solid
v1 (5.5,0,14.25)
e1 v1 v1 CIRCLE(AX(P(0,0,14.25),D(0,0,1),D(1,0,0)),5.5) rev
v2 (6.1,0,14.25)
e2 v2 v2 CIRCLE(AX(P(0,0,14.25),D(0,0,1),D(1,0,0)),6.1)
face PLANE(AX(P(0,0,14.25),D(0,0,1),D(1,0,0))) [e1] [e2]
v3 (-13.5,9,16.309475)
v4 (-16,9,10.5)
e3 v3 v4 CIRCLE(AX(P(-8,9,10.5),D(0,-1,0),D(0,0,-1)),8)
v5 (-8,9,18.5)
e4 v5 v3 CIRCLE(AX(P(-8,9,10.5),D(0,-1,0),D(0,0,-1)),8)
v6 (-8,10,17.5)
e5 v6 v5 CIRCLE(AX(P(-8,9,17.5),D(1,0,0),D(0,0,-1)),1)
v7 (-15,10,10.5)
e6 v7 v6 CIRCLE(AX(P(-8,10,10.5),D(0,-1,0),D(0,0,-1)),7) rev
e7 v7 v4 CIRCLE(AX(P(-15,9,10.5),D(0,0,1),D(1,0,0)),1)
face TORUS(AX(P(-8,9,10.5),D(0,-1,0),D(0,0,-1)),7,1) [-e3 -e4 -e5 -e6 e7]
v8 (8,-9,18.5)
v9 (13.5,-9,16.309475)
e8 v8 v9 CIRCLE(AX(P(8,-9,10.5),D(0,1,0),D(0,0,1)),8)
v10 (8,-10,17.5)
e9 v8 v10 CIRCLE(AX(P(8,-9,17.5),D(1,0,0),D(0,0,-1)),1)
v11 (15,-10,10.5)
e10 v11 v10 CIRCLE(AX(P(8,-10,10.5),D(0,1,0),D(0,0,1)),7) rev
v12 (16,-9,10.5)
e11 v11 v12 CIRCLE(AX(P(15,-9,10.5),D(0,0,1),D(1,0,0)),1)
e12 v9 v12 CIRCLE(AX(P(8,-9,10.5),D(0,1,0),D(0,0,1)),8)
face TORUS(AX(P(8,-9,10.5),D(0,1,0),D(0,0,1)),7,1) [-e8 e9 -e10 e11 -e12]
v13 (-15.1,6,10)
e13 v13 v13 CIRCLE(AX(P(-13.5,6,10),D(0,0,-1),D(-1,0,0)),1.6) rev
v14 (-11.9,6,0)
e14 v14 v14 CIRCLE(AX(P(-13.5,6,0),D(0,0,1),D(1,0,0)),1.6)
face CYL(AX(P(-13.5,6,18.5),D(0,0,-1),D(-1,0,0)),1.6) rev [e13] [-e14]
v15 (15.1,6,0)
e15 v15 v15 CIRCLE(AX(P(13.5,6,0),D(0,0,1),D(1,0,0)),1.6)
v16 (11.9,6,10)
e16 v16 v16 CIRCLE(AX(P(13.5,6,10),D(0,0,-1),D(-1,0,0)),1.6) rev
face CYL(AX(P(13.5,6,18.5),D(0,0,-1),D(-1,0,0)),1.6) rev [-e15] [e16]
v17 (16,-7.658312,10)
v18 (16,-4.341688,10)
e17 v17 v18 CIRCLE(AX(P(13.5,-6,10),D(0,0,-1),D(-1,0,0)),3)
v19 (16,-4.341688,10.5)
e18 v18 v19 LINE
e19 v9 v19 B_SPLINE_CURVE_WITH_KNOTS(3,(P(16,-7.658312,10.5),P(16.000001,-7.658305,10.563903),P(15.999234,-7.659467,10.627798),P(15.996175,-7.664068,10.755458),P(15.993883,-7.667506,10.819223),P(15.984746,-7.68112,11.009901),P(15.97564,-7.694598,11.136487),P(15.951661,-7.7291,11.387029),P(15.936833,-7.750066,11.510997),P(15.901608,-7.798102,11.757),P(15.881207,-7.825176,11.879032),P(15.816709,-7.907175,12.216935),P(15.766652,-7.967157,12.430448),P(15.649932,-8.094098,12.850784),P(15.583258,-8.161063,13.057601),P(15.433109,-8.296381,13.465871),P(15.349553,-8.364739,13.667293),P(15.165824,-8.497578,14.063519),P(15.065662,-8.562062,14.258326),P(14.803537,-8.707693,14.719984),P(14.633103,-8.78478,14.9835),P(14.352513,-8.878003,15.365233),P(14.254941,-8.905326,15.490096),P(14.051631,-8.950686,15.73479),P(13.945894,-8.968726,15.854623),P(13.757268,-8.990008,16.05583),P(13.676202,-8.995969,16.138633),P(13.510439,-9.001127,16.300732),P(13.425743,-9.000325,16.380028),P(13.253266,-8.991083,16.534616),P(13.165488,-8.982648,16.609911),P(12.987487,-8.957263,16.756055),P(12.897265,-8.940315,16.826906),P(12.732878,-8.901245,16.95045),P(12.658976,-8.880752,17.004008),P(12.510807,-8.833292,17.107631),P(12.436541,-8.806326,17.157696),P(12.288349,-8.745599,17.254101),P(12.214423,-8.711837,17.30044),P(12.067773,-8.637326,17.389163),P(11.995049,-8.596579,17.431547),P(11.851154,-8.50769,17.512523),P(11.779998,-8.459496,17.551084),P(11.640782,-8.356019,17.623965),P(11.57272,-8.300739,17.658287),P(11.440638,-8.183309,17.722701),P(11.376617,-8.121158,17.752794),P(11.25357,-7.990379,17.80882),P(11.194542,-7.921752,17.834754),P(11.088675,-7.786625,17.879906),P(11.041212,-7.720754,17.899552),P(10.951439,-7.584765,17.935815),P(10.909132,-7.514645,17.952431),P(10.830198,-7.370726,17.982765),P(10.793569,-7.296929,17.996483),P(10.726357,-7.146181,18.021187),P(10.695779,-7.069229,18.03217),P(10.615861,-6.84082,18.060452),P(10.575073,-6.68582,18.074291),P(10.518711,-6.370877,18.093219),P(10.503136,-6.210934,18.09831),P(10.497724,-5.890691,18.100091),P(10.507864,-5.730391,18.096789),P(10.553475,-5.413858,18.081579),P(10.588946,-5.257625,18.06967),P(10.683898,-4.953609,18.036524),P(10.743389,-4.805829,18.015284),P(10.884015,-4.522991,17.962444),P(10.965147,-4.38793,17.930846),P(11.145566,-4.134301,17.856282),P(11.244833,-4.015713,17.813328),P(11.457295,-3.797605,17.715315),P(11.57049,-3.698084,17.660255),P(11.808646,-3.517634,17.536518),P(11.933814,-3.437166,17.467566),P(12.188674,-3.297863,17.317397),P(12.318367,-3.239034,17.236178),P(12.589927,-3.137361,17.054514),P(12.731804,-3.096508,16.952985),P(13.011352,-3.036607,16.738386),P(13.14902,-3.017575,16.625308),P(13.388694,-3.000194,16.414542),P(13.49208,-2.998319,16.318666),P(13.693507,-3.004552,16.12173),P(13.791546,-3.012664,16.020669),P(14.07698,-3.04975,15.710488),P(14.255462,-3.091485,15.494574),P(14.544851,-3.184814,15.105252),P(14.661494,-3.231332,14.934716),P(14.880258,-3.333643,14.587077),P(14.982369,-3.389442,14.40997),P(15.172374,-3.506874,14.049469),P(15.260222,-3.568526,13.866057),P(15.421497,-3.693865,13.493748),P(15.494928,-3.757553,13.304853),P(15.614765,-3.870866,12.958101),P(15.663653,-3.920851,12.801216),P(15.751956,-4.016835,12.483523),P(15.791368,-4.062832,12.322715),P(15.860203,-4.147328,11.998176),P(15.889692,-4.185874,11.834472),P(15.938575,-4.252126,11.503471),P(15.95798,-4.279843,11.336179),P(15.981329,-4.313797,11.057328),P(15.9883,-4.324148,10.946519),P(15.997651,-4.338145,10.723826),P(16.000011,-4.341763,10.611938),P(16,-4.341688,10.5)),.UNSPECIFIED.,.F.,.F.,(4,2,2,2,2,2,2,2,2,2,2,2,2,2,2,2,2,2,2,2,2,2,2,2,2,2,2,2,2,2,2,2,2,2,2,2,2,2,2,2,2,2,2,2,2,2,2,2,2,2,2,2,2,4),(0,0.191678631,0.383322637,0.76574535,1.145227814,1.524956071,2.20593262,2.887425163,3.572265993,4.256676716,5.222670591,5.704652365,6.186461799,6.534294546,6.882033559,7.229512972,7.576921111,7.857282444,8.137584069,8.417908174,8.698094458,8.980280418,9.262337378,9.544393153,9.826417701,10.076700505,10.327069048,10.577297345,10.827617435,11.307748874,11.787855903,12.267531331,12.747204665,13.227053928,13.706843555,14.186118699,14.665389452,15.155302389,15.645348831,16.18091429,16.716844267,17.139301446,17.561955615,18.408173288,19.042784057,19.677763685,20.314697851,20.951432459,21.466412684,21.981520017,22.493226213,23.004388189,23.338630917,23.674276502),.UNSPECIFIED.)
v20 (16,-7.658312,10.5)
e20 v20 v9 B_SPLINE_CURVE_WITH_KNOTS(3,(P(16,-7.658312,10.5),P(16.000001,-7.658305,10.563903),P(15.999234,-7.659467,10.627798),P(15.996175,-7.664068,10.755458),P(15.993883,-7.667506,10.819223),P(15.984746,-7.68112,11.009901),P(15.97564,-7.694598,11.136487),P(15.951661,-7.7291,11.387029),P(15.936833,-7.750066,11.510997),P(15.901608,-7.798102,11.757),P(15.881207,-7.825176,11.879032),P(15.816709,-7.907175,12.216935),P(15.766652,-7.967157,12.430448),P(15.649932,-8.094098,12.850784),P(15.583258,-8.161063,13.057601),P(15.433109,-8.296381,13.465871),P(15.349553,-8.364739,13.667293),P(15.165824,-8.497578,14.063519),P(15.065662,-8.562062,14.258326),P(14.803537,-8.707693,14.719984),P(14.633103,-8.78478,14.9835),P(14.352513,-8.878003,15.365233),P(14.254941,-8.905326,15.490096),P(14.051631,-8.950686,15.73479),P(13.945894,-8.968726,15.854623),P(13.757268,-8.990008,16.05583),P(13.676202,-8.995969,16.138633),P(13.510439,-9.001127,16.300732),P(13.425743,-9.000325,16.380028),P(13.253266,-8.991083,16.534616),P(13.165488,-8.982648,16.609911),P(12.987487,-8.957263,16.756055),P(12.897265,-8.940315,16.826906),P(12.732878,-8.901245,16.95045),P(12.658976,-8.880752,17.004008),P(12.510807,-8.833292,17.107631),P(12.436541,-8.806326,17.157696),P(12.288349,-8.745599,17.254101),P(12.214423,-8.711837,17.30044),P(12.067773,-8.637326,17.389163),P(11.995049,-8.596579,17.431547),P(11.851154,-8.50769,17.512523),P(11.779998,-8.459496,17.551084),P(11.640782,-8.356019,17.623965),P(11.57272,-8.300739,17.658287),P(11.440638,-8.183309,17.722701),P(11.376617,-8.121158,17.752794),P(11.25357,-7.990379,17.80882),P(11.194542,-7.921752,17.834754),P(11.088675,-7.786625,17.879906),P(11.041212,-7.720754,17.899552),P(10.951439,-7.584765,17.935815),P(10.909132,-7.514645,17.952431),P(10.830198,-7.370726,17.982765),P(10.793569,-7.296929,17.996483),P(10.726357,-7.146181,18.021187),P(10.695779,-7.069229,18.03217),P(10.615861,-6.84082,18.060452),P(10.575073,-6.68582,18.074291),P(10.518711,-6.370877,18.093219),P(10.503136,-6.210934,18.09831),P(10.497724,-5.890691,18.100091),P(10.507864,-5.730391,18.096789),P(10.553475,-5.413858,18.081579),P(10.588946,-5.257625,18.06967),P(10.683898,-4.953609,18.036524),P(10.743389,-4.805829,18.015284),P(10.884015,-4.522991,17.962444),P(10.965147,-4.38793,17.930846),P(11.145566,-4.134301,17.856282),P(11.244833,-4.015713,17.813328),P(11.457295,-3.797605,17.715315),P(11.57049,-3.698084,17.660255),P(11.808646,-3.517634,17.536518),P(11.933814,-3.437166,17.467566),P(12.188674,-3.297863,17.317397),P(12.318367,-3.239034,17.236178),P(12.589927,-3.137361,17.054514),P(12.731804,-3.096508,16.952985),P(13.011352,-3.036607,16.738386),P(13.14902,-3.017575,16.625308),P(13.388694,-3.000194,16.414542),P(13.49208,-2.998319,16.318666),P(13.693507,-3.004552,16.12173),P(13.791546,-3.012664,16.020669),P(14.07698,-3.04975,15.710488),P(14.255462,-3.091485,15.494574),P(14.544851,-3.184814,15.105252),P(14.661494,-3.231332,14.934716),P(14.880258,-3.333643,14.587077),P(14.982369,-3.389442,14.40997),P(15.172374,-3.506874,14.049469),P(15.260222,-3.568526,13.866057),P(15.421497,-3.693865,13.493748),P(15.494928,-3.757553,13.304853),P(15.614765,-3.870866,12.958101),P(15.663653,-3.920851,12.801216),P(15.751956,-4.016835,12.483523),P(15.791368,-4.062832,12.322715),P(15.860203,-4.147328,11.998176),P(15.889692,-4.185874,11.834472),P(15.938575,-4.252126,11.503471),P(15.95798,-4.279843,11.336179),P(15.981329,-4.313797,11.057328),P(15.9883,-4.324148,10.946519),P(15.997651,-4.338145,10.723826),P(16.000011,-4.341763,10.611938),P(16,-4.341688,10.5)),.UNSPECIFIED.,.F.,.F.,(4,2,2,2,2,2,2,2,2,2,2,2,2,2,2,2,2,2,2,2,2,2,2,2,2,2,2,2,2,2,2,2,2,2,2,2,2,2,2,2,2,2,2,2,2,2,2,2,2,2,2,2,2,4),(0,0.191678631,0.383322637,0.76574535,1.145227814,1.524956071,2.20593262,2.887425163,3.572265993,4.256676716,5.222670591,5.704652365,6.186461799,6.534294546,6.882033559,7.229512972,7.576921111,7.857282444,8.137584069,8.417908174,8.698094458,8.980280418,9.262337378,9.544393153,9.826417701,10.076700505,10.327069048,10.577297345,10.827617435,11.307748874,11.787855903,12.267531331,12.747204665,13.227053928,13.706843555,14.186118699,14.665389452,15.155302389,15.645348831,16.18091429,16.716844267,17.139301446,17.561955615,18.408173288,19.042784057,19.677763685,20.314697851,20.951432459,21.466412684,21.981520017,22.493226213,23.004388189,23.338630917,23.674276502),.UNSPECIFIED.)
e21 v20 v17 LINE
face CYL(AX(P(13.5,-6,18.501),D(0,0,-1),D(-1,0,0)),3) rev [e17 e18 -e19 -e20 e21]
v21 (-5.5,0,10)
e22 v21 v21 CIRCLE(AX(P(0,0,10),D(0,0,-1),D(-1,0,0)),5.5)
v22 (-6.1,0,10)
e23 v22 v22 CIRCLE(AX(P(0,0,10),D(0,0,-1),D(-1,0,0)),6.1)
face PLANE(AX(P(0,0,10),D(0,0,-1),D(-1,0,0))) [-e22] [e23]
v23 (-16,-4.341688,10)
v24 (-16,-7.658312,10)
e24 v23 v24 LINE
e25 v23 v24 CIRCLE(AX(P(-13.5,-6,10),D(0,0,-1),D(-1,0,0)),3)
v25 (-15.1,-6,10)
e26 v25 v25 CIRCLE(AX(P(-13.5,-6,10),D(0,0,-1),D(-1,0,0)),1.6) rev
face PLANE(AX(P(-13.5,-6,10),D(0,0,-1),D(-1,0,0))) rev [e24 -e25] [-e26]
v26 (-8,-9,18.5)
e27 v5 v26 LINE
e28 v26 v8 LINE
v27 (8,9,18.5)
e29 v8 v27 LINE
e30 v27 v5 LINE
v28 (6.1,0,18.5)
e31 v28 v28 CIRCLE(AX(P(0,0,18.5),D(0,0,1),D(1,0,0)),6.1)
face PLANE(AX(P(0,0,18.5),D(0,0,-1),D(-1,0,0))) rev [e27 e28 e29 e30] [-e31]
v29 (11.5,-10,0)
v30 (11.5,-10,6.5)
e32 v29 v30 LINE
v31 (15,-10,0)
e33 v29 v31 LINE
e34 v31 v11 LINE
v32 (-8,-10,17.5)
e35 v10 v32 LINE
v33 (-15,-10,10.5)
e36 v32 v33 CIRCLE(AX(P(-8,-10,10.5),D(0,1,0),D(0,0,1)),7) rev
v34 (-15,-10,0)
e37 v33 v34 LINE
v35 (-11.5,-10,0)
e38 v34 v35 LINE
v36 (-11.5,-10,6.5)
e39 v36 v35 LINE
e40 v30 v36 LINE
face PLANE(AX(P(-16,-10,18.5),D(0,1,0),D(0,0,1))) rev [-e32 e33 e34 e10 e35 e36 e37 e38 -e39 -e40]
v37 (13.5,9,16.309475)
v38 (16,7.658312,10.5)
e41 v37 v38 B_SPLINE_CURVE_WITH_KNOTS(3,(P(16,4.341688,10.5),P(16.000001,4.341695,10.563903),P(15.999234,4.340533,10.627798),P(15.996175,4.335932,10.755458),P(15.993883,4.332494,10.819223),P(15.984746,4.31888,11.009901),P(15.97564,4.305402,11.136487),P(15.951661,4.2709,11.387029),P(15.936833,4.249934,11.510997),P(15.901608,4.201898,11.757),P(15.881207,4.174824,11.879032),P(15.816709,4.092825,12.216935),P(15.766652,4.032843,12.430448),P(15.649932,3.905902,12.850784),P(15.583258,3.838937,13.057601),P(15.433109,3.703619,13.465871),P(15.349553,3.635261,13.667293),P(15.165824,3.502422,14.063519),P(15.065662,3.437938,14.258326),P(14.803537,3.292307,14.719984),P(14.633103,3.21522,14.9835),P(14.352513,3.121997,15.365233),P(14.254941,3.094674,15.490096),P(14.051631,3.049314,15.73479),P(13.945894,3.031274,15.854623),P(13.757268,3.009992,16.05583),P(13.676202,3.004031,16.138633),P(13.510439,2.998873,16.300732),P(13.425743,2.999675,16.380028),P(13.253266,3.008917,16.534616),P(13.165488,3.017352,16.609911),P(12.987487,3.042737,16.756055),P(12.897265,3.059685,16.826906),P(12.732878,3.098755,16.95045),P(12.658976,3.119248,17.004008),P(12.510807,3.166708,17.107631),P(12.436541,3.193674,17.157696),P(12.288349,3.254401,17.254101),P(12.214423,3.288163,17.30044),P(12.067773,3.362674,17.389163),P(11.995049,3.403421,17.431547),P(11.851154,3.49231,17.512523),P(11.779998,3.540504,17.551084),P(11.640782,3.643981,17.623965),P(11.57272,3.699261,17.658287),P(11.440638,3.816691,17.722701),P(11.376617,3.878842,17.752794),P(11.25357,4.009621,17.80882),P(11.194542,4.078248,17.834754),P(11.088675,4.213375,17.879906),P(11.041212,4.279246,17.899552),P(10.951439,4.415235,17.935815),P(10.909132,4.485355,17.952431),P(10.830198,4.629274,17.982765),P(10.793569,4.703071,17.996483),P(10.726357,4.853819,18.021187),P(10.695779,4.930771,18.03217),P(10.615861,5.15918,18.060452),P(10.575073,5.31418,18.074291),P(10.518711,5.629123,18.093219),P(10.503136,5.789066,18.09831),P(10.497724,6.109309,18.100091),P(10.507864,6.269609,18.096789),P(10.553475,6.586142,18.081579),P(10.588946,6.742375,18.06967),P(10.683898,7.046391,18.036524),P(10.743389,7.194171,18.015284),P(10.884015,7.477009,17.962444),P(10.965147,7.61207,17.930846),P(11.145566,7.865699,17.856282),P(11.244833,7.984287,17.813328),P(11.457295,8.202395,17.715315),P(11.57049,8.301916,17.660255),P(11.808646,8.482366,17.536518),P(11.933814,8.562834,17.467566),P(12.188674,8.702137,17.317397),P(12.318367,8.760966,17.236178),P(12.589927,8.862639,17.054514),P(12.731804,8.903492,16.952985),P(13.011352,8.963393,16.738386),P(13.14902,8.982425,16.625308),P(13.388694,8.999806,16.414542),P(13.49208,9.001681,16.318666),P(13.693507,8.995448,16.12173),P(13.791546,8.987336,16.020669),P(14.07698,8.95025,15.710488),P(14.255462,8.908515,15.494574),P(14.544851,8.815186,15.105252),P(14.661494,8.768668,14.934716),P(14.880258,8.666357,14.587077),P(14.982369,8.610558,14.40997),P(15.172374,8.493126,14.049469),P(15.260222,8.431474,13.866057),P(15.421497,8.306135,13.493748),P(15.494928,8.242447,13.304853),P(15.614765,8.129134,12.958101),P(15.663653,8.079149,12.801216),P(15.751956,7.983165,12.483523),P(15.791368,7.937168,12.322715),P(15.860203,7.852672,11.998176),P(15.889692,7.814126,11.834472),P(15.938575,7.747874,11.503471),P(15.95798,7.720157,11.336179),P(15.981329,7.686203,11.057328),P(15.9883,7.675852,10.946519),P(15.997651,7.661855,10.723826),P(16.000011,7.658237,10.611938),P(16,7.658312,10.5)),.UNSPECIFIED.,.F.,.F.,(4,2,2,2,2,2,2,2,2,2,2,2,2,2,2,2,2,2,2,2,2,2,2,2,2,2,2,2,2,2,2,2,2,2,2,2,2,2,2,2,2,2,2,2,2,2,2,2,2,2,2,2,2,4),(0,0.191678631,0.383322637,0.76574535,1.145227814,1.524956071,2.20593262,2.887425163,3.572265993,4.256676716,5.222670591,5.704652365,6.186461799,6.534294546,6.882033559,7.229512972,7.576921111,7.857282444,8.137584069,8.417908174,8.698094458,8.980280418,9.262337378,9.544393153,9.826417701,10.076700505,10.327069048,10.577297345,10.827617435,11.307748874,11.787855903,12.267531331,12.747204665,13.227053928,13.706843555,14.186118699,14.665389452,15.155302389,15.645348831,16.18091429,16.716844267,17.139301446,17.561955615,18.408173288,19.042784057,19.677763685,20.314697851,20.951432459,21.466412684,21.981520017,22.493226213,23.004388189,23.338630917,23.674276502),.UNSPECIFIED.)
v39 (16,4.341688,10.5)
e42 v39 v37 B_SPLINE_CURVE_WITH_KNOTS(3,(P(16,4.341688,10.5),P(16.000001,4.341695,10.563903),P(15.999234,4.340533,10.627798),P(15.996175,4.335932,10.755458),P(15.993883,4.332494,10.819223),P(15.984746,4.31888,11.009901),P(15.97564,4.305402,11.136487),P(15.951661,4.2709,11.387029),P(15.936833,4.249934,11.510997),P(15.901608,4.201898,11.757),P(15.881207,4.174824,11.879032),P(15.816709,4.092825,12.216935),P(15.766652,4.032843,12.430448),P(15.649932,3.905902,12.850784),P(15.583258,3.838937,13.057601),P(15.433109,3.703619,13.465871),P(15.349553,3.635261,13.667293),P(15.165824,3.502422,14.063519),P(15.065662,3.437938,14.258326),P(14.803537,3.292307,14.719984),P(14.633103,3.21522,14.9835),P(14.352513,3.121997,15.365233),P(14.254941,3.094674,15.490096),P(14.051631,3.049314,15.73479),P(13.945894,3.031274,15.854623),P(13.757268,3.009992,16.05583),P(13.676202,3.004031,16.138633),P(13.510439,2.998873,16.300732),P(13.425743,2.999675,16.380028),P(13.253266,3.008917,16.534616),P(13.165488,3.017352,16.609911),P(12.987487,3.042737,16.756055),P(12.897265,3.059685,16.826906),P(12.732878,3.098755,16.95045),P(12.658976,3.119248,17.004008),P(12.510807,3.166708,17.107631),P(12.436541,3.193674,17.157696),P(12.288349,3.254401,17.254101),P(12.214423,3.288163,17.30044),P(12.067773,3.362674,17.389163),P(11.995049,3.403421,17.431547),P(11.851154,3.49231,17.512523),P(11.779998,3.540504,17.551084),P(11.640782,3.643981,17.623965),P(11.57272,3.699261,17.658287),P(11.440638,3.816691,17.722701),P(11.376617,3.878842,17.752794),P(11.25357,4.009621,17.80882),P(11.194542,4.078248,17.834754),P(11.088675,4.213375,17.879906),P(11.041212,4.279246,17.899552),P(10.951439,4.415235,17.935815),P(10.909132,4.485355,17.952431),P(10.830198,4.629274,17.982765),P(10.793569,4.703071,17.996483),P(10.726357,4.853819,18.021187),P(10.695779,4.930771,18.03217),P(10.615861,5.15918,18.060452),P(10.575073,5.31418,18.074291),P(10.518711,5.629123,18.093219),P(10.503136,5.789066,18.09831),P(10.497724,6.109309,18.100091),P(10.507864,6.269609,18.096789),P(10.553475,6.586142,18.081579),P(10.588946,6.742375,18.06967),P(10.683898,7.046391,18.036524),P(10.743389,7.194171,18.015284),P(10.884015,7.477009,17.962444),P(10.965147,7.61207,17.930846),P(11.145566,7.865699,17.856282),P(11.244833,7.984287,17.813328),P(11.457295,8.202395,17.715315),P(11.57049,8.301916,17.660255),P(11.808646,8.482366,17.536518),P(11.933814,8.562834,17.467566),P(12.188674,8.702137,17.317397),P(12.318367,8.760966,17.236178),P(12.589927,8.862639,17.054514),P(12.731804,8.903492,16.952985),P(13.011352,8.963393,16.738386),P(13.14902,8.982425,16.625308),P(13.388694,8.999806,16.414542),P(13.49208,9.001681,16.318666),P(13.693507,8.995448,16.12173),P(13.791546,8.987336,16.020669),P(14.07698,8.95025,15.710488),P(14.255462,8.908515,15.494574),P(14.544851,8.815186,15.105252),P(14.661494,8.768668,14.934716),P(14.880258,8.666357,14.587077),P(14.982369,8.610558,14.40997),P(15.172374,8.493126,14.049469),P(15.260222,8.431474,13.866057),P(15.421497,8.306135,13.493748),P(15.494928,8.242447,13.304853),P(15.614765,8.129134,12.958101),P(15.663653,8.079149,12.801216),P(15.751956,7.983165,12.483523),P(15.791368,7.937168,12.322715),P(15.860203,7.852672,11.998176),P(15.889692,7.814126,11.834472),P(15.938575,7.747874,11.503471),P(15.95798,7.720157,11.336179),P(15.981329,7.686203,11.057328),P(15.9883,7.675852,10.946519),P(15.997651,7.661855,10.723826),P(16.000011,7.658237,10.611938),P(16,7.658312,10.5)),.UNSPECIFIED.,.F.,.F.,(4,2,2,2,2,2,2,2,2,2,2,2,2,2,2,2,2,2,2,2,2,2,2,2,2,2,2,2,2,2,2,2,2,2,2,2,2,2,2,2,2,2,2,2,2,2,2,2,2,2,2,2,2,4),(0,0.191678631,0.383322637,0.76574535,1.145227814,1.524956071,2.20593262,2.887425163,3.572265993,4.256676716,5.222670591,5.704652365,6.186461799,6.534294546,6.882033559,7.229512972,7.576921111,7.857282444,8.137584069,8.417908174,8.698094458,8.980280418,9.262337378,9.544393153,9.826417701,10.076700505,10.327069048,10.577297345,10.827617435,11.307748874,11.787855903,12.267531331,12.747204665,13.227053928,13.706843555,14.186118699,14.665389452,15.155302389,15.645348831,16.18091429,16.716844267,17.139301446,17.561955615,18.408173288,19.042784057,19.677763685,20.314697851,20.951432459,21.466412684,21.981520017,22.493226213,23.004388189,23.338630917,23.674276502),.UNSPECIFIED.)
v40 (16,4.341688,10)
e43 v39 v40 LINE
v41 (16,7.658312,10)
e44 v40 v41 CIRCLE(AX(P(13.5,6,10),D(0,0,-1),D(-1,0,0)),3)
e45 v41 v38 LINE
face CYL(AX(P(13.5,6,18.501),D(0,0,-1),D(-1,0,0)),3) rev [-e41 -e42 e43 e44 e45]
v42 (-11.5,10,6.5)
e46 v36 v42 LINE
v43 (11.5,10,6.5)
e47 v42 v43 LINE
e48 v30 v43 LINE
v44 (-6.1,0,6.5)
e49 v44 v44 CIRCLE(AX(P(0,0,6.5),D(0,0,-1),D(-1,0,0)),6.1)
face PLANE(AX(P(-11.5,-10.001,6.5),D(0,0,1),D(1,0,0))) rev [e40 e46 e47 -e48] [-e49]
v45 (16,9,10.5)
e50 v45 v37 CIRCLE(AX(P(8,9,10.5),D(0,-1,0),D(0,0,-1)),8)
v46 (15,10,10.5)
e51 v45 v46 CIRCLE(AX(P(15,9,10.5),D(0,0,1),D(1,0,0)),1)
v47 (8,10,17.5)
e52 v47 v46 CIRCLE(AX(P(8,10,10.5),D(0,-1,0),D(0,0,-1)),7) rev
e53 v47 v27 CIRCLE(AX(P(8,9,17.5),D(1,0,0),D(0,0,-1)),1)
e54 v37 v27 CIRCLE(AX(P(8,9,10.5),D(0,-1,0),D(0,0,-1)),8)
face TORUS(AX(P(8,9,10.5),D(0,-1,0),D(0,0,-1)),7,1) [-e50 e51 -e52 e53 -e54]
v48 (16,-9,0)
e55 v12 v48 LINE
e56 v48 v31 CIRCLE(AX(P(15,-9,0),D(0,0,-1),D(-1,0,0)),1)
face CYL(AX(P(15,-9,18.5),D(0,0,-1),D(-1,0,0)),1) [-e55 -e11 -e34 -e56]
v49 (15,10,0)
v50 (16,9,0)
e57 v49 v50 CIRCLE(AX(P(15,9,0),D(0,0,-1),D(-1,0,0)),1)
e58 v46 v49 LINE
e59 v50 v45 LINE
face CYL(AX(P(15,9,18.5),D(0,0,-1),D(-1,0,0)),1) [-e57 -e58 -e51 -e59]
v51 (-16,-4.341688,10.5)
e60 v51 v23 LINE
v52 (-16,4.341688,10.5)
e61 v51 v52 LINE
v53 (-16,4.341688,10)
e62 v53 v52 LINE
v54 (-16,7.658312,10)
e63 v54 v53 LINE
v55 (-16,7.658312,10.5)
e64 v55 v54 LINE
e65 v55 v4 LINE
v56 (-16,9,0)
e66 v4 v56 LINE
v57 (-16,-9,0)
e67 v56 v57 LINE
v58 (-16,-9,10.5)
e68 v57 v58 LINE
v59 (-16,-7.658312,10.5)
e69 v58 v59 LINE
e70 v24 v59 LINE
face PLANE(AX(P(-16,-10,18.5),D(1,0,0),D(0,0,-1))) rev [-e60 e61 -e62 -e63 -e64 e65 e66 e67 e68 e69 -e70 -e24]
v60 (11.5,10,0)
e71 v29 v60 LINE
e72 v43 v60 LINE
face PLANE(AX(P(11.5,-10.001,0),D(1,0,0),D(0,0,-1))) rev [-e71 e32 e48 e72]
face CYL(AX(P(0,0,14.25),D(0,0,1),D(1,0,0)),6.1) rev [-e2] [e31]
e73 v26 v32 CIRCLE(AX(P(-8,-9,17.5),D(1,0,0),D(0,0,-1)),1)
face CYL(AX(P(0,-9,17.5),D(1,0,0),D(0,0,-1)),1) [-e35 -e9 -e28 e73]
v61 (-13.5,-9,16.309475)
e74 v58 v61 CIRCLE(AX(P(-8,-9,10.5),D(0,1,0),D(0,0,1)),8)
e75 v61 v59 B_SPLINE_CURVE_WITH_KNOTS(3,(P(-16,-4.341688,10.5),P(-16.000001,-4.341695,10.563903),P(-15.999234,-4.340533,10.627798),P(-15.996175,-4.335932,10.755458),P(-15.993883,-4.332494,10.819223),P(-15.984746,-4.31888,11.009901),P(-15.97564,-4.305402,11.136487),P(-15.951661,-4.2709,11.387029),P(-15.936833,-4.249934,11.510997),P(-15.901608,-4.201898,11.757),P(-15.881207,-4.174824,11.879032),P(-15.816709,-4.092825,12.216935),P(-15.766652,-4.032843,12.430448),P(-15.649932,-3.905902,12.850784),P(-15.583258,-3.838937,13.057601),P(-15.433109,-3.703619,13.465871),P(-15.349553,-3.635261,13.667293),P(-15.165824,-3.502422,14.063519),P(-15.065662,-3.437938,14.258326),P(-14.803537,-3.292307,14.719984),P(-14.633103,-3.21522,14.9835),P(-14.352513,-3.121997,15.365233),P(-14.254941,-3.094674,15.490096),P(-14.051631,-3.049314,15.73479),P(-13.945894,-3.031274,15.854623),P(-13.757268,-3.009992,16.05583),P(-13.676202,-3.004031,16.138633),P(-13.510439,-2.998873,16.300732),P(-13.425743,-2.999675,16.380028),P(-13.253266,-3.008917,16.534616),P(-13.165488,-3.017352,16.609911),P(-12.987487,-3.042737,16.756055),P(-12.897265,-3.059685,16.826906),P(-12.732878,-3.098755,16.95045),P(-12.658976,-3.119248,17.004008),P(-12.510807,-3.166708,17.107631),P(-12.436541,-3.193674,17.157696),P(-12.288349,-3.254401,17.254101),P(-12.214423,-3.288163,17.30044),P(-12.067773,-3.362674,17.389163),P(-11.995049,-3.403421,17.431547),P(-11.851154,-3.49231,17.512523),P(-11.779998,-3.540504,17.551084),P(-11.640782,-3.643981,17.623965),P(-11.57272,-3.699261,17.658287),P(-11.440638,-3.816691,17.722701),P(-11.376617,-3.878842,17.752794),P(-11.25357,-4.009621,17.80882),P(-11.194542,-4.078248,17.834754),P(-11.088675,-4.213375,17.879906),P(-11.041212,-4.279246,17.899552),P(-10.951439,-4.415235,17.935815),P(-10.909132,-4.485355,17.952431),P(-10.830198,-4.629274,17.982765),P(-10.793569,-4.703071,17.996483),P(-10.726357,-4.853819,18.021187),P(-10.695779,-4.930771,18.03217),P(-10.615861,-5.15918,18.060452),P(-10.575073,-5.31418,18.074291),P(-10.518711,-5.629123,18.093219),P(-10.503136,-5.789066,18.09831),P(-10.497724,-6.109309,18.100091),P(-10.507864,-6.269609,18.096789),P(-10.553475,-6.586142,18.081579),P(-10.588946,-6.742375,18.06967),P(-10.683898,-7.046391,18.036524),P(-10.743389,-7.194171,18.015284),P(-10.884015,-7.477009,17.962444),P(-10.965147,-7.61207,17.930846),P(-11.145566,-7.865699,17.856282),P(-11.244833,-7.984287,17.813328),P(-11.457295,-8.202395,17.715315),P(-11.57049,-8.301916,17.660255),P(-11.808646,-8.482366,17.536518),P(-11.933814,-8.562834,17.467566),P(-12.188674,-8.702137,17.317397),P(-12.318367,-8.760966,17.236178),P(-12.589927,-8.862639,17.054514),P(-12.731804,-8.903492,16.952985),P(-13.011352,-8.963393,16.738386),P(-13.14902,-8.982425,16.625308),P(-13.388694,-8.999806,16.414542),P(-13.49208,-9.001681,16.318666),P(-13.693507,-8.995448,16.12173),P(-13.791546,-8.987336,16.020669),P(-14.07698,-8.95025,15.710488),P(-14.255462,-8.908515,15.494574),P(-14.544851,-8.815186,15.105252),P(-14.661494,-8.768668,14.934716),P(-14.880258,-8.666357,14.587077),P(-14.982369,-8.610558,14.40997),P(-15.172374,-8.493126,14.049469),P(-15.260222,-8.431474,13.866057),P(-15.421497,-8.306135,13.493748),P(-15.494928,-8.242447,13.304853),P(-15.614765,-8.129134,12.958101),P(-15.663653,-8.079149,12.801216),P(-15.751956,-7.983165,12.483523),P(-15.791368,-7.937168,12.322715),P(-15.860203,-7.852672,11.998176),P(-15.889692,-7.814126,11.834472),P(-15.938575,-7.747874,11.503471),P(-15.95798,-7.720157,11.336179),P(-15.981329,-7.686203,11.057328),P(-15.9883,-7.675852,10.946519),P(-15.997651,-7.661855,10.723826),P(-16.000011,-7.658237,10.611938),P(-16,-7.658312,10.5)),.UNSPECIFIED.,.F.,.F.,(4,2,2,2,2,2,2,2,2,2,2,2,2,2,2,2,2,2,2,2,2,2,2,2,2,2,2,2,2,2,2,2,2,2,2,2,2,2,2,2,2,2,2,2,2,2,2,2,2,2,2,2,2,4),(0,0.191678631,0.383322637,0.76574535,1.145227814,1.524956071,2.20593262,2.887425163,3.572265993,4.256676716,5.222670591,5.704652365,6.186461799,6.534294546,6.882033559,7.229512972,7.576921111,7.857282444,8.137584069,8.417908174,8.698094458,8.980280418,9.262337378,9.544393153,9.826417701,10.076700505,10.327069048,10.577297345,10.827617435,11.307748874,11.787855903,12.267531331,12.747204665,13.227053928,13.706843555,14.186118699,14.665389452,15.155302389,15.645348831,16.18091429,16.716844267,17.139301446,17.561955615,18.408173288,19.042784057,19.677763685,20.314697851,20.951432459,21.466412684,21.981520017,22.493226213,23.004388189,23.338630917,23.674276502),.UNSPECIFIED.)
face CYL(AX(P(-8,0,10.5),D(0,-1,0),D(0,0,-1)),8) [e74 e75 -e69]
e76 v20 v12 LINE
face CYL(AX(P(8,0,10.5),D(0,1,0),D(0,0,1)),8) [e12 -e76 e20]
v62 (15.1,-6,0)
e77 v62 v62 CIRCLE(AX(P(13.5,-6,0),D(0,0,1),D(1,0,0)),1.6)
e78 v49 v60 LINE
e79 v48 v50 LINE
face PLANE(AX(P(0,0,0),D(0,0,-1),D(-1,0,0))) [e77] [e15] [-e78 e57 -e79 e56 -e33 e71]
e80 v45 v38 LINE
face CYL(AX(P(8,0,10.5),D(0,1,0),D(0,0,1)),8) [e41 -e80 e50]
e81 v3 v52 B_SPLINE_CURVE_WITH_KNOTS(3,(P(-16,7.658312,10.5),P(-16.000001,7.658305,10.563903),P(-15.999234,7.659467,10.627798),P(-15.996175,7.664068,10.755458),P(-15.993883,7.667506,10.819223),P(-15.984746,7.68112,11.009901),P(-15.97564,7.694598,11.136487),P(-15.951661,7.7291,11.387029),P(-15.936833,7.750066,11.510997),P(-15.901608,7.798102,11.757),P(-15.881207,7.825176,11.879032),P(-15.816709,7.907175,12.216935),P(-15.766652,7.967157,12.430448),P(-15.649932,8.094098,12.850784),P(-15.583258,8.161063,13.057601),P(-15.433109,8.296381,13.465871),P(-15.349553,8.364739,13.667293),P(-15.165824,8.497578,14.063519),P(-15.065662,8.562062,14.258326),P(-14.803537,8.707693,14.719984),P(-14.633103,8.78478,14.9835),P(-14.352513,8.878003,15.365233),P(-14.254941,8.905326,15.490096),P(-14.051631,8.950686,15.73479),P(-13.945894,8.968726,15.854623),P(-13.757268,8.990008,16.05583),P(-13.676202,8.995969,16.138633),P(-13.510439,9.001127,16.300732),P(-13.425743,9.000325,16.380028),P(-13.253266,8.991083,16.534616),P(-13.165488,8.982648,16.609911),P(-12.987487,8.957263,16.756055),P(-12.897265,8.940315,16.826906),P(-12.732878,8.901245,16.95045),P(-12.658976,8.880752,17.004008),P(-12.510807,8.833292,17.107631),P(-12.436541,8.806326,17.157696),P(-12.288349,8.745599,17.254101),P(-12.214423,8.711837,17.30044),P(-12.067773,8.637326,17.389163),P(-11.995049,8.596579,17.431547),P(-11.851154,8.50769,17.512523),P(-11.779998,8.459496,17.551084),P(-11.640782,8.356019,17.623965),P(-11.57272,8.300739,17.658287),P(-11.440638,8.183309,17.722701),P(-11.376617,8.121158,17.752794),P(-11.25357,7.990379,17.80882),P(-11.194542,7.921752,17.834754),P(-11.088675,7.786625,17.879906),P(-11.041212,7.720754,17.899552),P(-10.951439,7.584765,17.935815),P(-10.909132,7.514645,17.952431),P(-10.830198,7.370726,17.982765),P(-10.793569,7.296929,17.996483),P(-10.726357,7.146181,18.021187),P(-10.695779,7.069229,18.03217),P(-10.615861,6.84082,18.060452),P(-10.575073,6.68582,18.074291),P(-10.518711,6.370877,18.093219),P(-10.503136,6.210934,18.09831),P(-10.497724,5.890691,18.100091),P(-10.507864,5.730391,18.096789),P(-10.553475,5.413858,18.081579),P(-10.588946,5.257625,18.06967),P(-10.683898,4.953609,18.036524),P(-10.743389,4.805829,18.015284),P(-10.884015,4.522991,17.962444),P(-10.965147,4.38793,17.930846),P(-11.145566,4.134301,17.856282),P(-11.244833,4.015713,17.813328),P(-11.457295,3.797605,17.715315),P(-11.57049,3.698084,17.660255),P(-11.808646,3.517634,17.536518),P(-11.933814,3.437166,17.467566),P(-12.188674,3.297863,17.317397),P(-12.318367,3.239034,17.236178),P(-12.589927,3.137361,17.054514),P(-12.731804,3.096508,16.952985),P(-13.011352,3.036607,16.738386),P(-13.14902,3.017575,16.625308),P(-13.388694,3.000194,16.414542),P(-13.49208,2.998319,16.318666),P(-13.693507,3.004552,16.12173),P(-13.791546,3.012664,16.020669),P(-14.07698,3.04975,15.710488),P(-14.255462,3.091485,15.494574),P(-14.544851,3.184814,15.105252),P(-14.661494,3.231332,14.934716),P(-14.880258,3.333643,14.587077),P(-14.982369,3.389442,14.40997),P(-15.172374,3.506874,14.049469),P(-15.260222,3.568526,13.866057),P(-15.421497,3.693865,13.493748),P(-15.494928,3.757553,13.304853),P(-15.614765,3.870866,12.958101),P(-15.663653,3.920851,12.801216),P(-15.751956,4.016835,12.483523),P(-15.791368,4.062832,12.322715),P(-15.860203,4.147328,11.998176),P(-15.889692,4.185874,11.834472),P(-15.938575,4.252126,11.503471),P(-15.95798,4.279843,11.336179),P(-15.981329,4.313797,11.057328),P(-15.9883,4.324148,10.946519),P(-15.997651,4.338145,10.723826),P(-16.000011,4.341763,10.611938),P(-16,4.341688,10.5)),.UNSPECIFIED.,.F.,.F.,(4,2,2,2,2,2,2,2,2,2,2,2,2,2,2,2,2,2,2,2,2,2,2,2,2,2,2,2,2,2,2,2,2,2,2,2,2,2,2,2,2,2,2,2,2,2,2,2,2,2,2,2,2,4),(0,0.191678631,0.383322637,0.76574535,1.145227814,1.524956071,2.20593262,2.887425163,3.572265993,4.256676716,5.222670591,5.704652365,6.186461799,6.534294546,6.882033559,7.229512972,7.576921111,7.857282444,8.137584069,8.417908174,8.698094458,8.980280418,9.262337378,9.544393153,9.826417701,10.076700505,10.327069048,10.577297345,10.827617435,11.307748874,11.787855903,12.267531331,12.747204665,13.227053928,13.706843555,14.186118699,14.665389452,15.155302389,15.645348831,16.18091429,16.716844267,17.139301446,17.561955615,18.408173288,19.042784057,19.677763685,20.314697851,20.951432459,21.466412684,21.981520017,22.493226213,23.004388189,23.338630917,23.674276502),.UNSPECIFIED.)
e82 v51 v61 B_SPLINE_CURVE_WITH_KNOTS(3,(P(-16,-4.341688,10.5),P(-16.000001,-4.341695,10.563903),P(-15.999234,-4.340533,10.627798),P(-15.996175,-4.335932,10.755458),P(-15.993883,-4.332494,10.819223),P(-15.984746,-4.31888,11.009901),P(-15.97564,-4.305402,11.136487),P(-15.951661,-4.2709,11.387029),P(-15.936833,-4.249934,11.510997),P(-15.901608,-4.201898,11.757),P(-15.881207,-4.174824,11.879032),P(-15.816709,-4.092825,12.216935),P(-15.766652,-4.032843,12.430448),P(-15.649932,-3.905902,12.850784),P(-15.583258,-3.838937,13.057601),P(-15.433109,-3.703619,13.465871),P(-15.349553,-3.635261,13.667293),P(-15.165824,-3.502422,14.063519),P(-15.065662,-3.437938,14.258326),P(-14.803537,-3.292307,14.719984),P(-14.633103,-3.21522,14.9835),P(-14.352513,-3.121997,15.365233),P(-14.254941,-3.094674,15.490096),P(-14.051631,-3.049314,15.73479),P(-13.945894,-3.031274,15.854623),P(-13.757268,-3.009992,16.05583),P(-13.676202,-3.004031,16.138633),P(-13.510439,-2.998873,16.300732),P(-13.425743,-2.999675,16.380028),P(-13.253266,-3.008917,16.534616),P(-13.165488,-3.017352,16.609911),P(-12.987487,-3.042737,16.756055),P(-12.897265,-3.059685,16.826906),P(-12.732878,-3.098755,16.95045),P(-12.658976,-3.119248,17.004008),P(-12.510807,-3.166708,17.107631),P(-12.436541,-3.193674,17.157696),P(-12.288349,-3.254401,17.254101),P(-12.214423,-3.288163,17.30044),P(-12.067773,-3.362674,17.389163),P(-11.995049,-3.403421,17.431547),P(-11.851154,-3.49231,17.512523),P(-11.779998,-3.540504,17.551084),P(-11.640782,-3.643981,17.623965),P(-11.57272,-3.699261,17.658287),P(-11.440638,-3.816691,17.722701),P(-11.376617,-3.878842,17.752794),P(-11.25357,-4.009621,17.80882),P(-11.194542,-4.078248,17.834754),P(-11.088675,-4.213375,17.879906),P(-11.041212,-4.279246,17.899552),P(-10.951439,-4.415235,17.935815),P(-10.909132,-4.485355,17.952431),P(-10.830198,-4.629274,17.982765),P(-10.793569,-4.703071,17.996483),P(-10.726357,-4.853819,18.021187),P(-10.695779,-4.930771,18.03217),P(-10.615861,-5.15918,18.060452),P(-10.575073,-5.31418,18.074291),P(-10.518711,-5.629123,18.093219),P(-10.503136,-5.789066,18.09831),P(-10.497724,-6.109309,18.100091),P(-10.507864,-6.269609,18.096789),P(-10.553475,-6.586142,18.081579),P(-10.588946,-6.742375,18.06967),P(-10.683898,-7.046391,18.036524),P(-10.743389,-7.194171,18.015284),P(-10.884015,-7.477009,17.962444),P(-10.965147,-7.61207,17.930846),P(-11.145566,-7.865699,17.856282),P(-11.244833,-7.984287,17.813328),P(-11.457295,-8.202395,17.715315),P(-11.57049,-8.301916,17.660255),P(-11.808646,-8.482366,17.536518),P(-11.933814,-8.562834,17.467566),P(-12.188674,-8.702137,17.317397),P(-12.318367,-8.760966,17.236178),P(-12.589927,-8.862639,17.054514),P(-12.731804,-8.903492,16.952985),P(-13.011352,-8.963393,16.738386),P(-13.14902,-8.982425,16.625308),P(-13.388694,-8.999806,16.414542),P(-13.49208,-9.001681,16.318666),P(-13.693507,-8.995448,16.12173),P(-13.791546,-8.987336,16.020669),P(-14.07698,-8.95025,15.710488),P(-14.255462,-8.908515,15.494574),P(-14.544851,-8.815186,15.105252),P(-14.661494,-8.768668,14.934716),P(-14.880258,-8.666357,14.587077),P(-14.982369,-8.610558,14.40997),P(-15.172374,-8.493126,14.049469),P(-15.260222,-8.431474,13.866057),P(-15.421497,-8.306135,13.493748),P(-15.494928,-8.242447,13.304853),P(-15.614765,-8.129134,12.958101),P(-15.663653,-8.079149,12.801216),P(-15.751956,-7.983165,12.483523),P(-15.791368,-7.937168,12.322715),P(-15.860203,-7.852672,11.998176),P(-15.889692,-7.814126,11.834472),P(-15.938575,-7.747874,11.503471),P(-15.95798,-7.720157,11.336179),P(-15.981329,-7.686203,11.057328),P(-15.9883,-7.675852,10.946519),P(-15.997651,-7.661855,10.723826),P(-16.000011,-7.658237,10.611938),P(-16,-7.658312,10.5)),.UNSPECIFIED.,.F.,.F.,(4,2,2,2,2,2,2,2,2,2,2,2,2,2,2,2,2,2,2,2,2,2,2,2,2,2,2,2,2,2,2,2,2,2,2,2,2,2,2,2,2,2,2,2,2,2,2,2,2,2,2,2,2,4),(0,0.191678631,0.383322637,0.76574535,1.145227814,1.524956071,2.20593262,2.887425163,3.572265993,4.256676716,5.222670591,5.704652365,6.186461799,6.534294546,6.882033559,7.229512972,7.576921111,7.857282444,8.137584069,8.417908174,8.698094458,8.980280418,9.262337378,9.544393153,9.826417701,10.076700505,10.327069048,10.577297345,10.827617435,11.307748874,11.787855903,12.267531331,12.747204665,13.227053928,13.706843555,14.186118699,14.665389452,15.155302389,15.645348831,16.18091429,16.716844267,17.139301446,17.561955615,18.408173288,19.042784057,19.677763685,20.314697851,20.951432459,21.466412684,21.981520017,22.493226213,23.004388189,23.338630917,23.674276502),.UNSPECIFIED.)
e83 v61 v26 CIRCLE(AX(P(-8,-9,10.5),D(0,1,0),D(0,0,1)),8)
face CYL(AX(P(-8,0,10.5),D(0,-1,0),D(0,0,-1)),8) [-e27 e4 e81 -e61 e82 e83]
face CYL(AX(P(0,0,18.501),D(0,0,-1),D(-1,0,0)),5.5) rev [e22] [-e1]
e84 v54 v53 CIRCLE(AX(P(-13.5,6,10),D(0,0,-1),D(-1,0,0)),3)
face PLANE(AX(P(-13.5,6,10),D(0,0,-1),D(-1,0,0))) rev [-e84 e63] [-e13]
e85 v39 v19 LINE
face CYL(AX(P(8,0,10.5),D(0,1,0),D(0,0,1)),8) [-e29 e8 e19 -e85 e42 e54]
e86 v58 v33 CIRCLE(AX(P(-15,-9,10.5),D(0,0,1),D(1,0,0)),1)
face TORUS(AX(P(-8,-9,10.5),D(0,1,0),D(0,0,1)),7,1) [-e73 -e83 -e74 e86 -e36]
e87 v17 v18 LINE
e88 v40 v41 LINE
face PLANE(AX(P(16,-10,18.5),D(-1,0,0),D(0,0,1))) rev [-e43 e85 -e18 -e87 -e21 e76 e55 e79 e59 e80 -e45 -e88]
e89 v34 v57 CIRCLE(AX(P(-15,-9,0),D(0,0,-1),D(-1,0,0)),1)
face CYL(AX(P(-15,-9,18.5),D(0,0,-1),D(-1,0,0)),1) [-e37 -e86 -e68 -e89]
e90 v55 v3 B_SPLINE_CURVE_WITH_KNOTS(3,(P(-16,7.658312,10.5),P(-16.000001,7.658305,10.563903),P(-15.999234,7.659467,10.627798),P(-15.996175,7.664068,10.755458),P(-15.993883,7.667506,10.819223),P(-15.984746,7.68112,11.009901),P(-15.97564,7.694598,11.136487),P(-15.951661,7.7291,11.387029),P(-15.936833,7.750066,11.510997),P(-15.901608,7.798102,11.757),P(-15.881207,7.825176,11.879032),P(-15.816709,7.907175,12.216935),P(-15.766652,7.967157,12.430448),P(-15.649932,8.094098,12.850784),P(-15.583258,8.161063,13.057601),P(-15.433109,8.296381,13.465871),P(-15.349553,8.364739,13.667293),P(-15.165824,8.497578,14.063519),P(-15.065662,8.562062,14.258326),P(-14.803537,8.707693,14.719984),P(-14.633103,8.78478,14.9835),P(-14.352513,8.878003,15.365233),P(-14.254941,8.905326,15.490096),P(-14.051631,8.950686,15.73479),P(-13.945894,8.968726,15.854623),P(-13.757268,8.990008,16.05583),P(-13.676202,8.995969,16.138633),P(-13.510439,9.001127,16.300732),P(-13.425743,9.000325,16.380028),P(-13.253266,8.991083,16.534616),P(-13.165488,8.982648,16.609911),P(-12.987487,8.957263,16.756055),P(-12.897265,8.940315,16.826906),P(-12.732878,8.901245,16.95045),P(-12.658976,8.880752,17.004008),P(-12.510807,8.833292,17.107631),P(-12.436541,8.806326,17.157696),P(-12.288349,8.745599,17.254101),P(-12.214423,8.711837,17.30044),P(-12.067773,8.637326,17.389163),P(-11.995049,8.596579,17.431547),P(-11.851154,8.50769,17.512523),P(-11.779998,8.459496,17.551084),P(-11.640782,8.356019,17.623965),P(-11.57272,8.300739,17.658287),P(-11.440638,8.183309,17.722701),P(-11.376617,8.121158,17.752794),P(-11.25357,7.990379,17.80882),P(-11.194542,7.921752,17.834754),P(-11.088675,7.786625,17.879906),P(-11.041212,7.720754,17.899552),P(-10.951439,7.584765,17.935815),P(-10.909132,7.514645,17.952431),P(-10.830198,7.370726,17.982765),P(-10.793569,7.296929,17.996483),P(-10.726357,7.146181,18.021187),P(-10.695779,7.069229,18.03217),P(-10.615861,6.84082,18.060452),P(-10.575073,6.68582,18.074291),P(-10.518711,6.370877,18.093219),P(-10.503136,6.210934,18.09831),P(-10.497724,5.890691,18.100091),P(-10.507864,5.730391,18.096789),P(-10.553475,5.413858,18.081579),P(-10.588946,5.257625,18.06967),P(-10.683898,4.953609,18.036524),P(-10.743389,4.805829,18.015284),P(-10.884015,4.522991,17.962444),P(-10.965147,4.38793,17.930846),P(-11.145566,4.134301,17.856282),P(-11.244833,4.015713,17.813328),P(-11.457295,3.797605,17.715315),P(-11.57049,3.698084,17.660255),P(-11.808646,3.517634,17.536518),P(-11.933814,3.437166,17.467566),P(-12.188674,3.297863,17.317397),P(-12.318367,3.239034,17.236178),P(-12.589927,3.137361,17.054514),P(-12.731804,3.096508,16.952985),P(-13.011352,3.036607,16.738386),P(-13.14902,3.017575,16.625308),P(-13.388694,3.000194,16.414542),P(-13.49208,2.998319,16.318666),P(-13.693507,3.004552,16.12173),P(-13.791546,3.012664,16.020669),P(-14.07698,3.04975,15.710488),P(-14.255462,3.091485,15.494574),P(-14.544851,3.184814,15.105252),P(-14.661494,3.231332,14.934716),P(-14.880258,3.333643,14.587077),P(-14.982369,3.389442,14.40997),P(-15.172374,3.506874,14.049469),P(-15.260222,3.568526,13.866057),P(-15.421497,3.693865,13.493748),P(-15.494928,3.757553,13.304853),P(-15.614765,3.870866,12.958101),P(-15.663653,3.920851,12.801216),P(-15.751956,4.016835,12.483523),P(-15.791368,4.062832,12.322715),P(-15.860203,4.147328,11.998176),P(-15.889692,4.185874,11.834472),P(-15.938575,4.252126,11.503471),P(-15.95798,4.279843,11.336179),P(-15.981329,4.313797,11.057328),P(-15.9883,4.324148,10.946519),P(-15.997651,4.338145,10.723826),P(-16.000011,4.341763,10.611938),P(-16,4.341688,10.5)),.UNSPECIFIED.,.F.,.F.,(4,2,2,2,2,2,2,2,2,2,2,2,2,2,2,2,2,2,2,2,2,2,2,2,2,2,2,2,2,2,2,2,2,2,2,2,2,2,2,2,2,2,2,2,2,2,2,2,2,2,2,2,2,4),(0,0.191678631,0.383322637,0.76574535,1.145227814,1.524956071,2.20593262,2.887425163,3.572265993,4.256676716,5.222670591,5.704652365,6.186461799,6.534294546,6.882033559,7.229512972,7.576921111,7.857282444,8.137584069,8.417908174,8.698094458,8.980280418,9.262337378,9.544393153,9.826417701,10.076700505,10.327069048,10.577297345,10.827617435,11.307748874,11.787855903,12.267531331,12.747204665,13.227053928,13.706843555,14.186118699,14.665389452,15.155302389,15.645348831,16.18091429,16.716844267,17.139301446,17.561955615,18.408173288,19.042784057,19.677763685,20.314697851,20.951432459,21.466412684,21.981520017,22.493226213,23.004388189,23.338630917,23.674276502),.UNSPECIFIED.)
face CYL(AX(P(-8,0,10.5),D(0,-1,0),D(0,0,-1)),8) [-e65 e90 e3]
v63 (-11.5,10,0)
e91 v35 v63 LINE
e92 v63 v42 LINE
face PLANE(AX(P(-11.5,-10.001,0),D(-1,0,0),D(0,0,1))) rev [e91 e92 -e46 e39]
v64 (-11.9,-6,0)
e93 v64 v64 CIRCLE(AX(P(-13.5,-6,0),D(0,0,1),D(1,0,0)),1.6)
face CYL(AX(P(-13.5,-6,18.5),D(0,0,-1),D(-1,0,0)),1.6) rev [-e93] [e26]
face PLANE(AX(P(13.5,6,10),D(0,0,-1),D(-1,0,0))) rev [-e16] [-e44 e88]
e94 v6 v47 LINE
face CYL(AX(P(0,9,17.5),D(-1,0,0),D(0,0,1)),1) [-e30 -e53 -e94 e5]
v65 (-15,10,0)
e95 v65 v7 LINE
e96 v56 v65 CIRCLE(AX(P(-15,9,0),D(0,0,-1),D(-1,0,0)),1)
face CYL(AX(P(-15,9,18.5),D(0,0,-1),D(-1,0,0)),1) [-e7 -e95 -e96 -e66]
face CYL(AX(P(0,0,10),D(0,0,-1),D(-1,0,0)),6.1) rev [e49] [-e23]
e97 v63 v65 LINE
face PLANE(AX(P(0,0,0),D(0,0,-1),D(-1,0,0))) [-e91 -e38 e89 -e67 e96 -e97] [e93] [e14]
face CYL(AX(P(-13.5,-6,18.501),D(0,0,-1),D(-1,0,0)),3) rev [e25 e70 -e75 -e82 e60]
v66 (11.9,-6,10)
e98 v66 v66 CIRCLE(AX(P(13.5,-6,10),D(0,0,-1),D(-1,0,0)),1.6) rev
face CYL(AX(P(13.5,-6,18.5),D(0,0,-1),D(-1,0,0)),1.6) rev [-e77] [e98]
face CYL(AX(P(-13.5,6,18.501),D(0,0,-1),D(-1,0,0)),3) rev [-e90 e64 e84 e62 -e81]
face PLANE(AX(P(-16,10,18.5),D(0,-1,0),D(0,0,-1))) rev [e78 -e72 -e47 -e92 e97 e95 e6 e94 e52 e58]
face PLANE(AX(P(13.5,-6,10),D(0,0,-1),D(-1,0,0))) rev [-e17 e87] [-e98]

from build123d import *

# Parameters (mm, degrees)
SKETCH3_W           = 32
SKETCH3_H           = 20
SKETCH3_R           = 1.6
BOSS_EXTRUDE1_DEPTH = 18.5
CUT_EXTRUDE1_REACH  = 33.595
SKETCH5_W           = 23
SKETCH5_H           = 6.5
FILLET2_START       = -11
FILLET2_DEPTH       = 22
FILLET1_R           = 1
CUT_EXTRUDE5_REACH  = 38.424
CUT_EXTRUDE5_START  = -10
SKETCH9_R           = 3
SKETCH10_R          = 6.1
CUT_EXTRUDE6_DEPTH  = 4.25
CUT_EXTRUDE7_START  = -3.5
SKETCH12_R          = 6.1
CUT_EXTRUDE7_DEPTH  = 3.5
CUT_EXTRUDE8_REACH  = 23.354
SKETCH13_R          = 5.5


with BuildPart() as part:
    # Sketch3 → Boss-Extrude1 (new body)
    with BuildSketch(Plane.XY):
        Rectangle(SKETCH3_W, SKETCH3_H)
        with Locations((-13.5, 6)):
            Circle(SKETCH3_R, mode=Mode.SUBTRACT)
        with Locations((-13.5, -6)):
            Circle(SKETCH3_R, mode=Mode.SUBTRACT)
        with Locations((13.5, -6)):
            Circle(SKETCH3_R, mode=Mode.SUBTRACT)
        with Locations((13.5, 6)):
            Circle(SKETCH3_R, mode=Mode.SUBTRACT)
    extrude(amount=BOSS_EXTRUDE1_DEPTH)

    # Sketch5 → Cut-Extrude1 (cut, up to next)
    with BuildSketch(Plane(origin=(0, 10, 0), x_dir=(1, 0, 0), z_dir=(0, 1, 0)), mode=Mode.PRIVATE) as cut_extrude1_sk1:
        with Locations((0, -3.25)):
            Rectangle(SKETCH5_W, SKETCH5_H)
    cut_extrude1_tool1 = extrude(cut_extrude1_sk1.sketch, amount=-CUT_EXTRUDE1_REACH, mode=Mode.PRIVATE) & part.part
    add(cut_extrude1_tool1.solids().sort_by_distance((0, 10, 3.25))[0], mode=Mode.SUBTRACT)

    # Fillet2: read off the stored shape, not the designer's step
    # Fillet2 outline → Fillet2 (cut)
    with BuildSketch(Plane(origin=(0, 0, 0), x_dir=(1, 0, 0), z_dir=(0, 1, 0)).offset(FILLET2_START)):
        with BuildLine():
            ThreePointArc((16, -10.5), (13.656854249, -16.156854249), (8, -18.5))
            Line((8, -18.5), (16, -18.5))
            Line((16, -18.5), (16, -10.5))
        make_face()
        with BuildLine():
            Line((-16, -18.5), (-8, -18.5))
            ThreePointArc((-8, -18.5), (-13.656854249, -16.156854249), (-16, -10.5))
            Line((-16, -10.5), (-16, -18.5))
        make_face()
    extrude(amount=FILLET2_DEPTH, mode=Mode.SUBTRACT)

    # Fillet1
    fillet1_edges = [part.edges().sort_by_distance(p)[0] for p in [
        (0, 10, 18.5),
        (0, -10, 18.5),
        (-16, 10, 5.25),
        (16, 10, 5.25),
        (-13.656854249, 10, 16.156854249),
        (13.656854249, 10, 16.156854249),
        (16, -10, 5.25),
        (-16, -10, 5.25),
        (-13.656854249, -10, 16.156854249),
        (13.656854249, -10, 16.156854249),
    ]]
    fillet(fillet1_edges, radius=FILLET1_R)

    # Sketch9 → Cut-Extrude5 (cut, up to next)
    with BuildSketch(Plane(origin=(0, 0, 0), x_dir=(-1, 0, 0), z_dir=(0, 0, -1)).offset(CUT_EXTRUDE5_START), mode=Mode.PRIVATE) as cut_extrude5_sk1:
        with Locations((-13.5, 6)):
            Circle(SKETCH9_R)
    cut_extrude5_tool1 = extrude(cut_extrude5_sk1.sketch, amount=-CUT_EXTRUDE5_REACH, mode=Mode.PRIVATE) & part.part
    # Sketch9 → Cut-Extrude5 (cut, up to next)
    with BuildSketch(Plane(origin=(0, 0, 0), x_dir=(-1, 0, 0), z_dir=(0, 0, -1)).offset(CUT_EXTRUDE5_START), mode=Mode.PRIVATE) as cut_extrude5_sk2:
        with Locations((-13.5, -6)):
            Circle(SKETCH9_R)
    cut_extrude5_tool2 = extrude(cut_extrude5_sk2.sketch, amount=-CUT_EXTRUDE5_REACH, mode=Mode.PRIVATE) & part.part
    # Sketch9 → Cut-Extrude5 (cut, up to next)
    with BuildSketch(Plane(origin=(0, 0, 0), x_dir=(-1, 0, 0), z_dir=(0, 0, -1)).offset(CUT_EXTRUDE5_START), mode=Mode.PRIVATE) as cut_extrude5_sk3:
        with Locations((13.5, -6)):
            Circle(SKETCH9_R)
    cut_extrude5_tool3 = extrude(cut_extrude5_sk3.sketch, amount=-CUT_EXTRUDE5_REACH, mode=Mode.PRIVATE) & part.part
    # Sketch9 → Cut-Extrude5 (cut, up to next)
    with BuildSketch(Plane(origin=(0, 0, 0), x_dir=(-1, 0, 0), z_dir=(0, 0, -1)).offset(CUT_EXTRUDE5_START), mode=Mode.PRIVATE) as cut_extrude5_sk4:
        with Locations((13.5, 6)):
            Circle(SKETCH9_R)
    cut_extrude5_tool4 = extrude(cut_extrude5_sk4.sketch, amount=-CUT_EXTRUDE5_REACH, mode=Mode.PRIVATE) & part.part
    add(cut_extrude5_tool1.solids().sort_by_distance((13.5, 6, 10))[0], mode=Mode.SUBTRACT)
    add(cut_extrude5_tool2.solids().sort_by_distance((13.5, -6, 10))[0], mode=Mode.SUBTRACT)
    add(cut_extrude5_tool3.solids().sort_by_distance((-13.5, -6, 10))[0], mode=Mode.SUBTRACT)
    add(cut_extrude5_tool4.solids().sort_by_distance((-13.5, 6, 10))[0], mode=Mode.SUBTRACT)

    # Sketch10 → Cut-Extrude6 (cut)
    with BuildSketch(Plane.XY.offset(18.5)):
        Circle(SKETCH10_R)
    extrude(amount=-CUT_EXTRUDE6_DEPTH, mode=Mode.SUBTRACT)

    # Sketch12 → Cut-Extrude7 (cut)
    with BuildSketch(Plane(origin=(0, 0, 6.5), x_dir=(-1, 0, 0), z_dir=(0, 0, -1)).offset(CUT_EXTRUDE7_START)):
        with Locations(Location((0, 0, 0), (0, 0, 180))):
            Circle(SKETCH12_R)
    extrude(amount=CUT_EXTRUDE7_DEPTH, mode=Mode.SUBTRACT)

    # Sketch13 → Cut-Extrude8 (cut, up to next)
    with BuildSketch(Plane(origin=(0, 0, 10), x_dir=(-1, 0, 0), z_dir=(0, 0, -1)), mode=Mode.PRIVATE) as cut_extrude8_sk1:
        Circle(SKETCH13_R)
    cut_extrude8_tool1 = extrude(cut_extrude8_sk1.sketch, amount=-CUT_EXTRUDE8_REACH, mode=Mode.PRIVATE) & part.part
    add(cut_extrude8_tool1.solids().sort_by_distance((0, 0, 10))[0], mode=Mode.SUBTRACT)


solid = part.part
